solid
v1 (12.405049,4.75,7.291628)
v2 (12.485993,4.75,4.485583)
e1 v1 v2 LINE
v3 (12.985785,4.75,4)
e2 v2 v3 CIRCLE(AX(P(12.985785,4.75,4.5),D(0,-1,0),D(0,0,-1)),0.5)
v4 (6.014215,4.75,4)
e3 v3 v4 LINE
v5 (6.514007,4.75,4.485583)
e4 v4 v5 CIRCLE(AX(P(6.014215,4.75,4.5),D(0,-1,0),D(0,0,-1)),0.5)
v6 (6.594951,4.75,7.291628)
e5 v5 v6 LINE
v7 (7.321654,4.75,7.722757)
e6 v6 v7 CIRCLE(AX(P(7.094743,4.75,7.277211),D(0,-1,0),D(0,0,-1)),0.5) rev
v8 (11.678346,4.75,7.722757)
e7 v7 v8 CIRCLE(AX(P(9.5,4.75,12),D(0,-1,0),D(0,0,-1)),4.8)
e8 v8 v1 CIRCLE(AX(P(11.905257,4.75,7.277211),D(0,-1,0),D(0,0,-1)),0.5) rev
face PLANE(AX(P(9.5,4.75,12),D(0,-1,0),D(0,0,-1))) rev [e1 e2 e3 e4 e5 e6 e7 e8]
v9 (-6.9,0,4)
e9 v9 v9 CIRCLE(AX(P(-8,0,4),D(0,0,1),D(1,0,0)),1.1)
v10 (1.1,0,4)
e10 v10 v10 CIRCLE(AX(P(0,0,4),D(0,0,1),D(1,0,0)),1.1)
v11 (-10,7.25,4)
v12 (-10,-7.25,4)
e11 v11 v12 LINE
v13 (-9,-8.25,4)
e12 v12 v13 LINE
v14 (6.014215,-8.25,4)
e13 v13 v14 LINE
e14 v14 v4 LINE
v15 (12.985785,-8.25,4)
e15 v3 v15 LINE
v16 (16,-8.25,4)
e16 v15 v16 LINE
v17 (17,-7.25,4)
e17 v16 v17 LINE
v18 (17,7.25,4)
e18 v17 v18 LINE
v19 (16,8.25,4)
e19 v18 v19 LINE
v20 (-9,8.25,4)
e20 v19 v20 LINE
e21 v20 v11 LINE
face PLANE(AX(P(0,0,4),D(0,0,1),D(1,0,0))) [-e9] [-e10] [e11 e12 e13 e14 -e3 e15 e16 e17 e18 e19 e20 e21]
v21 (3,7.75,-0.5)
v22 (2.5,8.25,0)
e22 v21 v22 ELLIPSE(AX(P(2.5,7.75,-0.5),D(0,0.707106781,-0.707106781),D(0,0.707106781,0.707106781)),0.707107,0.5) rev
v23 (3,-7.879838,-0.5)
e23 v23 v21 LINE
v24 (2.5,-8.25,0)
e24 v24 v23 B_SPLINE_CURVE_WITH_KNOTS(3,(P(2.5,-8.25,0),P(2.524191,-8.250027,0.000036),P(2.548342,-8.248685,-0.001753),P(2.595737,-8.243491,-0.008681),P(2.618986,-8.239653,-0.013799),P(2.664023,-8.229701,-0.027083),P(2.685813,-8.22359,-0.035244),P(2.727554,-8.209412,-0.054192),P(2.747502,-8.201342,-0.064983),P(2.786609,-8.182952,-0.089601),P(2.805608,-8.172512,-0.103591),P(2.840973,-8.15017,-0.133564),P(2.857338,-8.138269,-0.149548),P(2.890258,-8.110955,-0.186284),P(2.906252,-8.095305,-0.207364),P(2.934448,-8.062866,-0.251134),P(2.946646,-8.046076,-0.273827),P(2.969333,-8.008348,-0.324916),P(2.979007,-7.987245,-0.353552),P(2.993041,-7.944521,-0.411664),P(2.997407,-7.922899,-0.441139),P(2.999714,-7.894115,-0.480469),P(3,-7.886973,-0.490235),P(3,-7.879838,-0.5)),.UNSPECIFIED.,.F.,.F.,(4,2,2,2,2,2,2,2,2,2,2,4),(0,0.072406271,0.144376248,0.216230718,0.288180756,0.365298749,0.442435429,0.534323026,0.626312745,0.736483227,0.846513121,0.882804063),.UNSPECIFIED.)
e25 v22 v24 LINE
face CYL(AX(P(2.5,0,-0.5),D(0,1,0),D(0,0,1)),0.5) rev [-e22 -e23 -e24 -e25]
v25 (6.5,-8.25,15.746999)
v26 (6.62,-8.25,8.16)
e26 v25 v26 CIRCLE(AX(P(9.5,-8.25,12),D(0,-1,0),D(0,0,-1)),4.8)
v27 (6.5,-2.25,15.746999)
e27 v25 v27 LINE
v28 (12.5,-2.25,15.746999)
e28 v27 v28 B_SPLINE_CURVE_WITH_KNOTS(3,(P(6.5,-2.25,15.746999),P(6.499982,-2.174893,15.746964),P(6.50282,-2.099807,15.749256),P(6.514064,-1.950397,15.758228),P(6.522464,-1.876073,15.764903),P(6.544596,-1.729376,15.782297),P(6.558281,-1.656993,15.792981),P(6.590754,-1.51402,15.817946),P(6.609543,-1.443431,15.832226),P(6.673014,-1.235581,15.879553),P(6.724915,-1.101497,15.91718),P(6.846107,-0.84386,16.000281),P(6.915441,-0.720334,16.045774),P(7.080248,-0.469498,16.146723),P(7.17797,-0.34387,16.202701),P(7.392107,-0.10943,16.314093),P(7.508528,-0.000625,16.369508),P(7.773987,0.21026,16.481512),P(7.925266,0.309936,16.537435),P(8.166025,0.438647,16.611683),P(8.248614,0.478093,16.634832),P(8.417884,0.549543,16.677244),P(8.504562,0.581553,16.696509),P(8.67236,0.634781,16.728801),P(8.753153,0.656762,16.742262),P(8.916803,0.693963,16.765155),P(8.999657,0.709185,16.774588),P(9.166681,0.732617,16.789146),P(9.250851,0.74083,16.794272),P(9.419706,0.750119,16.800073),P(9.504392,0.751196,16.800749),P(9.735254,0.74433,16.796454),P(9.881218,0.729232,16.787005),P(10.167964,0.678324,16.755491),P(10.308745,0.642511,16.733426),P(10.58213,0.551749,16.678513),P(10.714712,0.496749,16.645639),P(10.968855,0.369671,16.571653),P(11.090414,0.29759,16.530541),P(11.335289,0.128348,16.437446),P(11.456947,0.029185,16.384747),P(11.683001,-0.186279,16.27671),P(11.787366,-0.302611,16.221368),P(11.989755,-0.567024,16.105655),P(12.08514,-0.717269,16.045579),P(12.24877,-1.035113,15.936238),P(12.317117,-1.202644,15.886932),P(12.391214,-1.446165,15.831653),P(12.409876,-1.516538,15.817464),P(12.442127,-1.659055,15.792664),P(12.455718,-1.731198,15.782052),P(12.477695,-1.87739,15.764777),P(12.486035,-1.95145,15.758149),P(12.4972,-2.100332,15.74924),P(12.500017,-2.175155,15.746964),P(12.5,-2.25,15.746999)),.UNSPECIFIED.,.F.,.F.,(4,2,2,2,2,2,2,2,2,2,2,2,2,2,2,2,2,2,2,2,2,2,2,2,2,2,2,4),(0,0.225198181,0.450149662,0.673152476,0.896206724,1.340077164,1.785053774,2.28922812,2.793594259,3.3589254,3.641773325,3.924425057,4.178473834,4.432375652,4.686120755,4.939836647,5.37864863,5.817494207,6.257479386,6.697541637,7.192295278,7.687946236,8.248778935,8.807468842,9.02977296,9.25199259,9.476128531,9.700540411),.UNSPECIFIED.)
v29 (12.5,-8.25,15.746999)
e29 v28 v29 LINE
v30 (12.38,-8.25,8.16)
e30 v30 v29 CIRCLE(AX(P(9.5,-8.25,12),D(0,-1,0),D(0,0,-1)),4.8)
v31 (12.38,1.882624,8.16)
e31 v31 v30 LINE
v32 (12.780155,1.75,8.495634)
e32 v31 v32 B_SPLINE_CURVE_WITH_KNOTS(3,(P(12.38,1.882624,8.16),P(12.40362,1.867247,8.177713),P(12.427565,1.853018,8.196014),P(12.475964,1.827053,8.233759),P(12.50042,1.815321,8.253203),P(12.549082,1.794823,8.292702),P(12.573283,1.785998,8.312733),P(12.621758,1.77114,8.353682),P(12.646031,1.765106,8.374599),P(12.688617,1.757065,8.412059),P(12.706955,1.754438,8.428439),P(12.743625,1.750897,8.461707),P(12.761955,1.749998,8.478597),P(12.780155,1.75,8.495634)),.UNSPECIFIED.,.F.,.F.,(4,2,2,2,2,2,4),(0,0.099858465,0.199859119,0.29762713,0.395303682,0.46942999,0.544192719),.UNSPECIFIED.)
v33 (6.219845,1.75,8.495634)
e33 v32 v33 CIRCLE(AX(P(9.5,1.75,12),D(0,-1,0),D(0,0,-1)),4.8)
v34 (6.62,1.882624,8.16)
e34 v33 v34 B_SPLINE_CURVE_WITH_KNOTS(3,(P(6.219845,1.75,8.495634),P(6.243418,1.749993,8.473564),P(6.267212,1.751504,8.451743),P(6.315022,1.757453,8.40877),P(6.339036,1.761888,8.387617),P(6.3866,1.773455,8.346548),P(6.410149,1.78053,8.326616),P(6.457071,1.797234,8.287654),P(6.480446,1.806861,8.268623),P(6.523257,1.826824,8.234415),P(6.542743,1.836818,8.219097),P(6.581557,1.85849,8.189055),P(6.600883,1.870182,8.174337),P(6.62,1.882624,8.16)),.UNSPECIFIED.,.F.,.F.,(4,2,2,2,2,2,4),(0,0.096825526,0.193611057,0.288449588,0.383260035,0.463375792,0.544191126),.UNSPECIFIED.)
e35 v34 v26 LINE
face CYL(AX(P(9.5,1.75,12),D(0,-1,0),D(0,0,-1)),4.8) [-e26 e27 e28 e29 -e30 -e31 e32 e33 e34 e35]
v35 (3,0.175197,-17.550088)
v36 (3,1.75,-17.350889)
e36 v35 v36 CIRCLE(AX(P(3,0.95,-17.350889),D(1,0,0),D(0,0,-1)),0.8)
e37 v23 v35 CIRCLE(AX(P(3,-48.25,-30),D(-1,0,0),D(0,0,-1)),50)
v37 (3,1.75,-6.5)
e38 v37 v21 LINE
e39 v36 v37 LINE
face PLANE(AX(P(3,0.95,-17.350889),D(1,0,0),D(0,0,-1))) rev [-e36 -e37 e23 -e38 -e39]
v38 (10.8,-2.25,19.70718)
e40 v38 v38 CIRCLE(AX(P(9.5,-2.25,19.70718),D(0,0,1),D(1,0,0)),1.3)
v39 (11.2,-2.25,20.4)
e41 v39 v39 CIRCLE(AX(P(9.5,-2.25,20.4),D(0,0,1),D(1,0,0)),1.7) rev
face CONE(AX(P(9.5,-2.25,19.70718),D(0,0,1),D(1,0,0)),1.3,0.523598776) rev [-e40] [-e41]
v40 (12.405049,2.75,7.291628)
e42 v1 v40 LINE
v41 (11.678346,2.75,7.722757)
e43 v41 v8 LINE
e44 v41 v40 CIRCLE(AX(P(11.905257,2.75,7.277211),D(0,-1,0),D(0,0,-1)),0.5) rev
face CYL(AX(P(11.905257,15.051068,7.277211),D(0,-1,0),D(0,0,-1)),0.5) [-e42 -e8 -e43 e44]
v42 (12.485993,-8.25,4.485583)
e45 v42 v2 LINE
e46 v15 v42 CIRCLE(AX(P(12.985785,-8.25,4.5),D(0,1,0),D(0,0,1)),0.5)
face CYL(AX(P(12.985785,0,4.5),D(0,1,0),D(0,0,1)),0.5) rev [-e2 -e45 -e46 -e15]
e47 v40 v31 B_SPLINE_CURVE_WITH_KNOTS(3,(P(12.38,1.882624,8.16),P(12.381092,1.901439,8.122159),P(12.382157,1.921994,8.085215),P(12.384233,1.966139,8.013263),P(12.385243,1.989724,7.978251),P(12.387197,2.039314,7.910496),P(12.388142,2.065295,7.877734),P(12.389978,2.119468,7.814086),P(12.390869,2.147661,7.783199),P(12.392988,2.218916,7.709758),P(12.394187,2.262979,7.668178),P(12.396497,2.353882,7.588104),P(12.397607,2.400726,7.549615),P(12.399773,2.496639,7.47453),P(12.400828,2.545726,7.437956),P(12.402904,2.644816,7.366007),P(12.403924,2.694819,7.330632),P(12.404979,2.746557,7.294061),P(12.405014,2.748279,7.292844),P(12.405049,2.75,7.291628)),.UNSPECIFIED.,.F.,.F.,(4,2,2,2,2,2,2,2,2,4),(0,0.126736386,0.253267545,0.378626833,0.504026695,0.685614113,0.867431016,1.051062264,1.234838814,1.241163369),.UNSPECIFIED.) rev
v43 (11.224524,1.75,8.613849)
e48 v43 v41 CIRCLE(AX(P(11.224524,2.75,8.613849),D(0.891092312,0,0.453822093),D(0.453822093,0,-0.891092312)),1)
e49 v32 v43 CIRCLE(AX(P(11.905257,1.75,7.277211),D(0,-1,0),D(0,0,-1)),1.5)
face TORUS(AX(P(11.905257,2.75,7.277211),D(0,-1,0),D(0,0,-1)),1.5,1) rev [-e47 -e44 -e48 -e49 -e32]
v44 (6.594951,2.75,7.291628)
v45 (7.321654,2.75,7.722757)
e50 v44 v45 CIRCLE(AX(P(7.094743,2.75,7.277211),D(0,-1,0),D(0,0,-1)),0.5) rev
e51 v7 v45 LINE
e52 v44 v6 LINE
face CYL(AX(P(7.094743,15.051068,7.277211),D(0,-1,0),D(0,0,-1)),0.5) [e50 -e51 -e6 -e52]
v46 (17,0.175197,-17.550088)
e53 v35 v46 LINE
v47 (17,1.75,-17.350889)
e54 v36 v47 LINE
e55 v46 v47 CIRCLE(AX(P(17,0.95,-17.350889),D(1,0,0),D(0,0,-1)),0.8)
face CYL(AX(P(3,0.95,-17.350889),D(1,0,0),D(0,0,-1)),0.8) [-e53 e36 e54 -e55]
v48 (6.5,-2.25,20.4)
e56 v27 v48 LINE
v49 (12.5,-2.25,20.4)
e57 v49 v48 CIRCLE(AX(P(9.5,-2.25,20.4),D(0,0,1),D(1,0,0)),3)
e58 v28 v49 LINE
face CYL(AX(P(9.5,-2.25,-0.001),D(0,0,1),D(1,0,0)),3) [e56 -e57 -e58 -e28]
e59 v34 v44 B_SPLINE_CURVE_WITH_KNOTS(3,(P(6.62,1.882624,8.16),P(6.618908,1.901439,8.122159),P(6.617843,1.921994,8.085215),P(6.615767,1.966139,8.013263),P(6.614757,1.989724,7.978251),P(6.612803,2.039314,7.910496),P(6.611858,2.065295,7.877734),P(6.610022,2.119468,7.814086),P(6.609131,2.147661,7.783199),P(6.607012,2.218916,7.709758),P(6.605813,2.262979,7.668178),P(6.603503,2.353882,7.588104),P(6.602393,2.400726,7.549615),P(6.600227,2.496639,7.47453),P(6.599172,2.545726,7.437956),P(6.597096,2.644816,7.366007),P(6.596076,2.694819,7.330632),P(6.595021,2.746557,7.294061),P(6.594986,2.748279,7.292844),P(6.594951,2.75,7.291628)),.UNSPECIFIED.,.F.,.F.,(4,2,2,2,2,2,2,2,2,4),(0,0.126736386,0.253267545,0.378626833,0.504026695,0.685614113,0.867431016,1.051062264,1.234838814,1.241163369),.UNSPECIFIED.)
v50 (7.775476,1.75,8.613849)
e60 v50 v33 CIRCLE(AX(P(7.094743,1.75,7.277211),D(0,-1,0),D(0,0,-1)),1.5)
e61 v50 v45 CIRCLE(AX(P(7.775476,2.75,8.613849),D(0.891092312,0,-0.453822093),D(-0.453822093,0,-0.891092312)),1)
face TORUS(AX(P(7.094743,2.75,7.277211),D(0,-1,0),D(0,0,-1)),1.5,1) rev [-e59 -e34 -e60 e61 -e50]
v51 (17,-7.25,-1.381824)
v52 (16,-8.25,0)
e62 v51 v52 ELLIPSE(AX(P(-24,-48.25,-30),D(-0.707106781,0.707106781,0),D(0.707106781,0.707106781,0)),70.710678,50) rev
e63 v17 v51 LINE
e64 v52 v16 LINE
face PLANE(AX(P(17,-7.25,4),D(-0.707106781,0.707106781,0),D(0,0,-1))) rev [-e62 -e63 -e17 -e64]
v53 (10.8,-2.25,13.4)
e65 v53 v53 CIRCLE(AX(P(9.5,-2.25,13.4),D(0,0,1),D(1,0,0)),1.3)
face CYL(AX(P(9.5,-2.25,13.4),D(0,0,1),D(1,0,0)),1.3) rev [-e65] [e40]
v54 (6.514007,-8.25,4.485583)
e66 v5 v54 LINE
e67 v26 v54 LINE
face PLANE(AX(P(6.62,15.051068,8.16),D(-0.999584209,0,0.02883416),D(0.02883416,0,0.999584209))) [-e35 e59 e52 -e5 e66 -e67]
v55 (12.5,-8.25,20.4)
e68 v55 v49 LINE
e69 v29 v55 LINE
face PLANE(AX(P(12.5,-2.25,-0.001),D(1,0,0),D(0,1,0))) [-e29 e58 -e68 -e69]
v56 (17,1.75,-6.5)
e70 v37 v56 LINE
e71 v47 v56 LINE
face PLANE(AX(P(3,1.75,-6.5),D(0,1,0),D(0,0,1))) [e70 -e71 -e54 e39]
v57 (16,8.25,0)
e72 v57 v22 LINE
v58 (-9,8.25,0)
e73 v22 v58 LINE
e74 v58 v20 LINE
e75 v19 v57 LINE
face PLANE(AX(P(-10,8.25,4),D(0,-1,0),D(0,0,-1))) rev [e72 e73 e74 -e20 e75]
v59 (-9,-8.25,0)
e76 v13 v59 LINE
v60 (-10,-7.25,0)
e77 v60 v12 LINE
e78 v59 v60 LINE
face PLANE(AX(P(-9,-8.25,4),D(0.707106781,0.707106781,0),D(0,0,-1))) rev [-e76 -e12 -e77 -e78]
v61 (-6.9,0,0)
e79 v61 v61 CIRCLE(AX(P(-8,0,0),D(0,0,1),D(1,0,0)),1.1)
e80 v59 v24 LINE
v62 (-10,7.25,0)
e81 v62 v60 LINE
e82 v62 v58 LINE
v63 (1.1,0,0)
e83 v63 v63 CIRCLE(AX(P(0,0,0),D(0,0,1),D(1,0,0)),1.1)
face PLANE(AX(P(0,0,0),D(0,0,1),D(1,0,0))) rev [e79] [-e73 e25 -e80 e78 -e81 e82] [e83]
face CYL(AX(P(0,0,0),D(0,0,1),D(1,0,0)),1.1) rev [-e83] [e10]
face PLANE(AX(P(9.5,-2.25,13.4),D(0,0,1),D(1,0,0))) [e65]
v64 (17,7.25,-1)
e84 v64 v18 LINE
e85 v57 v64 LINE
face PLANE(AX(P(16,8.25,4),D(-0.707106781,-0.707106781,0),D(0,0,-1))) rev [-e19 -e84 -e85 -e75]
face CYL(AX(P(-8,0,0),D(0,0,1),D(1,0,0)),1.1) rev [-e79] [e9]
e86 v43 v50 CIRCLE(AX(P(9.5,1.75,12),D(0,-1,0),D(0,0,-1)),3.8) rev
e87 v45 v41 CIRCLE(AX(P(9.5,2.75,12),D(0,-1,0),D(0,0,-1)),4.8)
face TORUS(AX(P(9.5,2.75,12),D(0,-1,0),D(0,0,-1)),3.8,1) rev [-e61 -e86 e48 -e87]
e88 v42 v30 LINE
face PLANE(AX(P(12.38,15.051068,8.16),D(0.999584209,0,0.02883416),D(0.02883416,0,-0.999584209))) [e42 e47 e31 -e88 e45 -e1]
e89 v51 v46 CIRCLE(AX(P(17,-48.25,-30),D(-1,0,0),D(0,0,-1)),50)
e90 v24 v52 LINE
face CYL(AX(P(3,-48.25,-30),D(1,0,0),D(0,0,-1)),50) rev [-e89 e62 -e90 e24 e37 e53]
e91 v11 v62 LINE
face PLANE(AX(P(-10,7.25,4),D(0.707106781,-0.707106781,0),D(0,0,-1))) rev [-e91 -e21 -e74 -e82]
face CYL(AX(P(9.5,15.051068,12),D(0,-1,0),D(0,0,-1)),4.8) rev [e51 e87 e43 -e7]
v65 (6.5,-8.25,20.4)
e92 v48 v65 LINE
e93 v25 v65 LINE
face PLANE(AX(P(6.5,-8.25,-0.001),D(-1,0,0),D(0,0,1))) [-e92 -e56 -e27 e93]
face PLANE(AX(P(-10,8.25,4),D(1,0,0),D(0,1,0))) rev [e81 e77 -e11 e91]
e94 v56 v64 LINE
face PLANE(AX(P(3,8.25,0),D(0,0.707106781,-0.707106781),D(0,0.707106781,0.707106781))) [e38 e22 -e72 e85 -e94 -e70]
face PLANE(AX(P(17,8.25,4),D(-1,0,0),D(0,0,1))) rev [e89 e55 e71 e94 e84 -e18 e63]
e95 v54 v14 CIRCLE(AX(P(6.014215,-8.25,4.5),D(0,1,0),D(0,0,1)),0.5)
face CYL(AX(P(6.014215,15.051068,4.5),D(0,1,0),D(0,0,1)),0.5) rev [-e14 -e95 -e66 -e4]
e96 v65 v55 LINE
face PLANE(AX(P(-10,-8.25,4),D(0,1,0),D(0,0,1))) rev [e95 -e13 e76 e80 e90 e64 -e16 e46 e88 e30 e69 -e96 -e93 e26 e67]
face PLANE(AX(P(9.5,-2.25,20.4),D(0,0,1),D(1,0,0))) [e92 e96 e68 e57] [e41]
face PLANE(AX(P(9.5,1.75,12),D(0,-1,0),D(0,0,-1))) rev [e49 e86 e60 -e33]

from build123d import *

# Parameters (mm, degrees)
SKETCH_1_W           = 27
SKETCH_1_H           = 16.5
EXTRUDE_1_DEPTH      = 4
SKETCH_2_R           = 1.1
CUT_EXTRUDE_1_DEPTH  = 4
SKETCH_3_R           = 4.8
EXTRUDE_2_DEPTH      = 10
EXTRUDE_3_DEPTH      = 13
FILLET_1_R           = 0.5
FILLET_2_R           = 1
EXTRUDE_4_REACH      = 29.807
EXTRUDE_4_END_RADIUS = 4.8
SKETCH_7_R           = 1.3
CUT_EXTRUDE_3_DEPTH  = 7
CHAMFER_1_SIZE       = 0.4
CHAMFER_1_SIZE2      = 0.692820323
FILLET_3_R           = 0.5
EXTRUDE_5_DEPTH      = 14
FILLET_4_R           = 0.5
CHAMFER_2_SIZE       = 1


with BuildPart() as part:
    # 草图1 → 凸台-拉伸1 (new body)
    with BuildSketch(Plane.XY):
        with Locations((3.5, 0)):
            Rectangle(SKETCH_1_W, SKETCH_1_H)
    extrude(amount=EXTRUDE_1_DEPTH)

    # 草图2 → 切除-拉伸1 (cut)
    with BuildSketch(Plane.XY.offset(4)):
        with Locations((-8, 0)):
            Circle(SKETCH_2_R)
        Circle(SKETCH_2_R)
    extrude(amount=-CUT_EXTRUDE_1_DEPTH, mode=Mode.SUBTRACT)



with BuildPart() as body_2:
    # 草图3 → 凸台-拉伸2 (new body)
    with BuildSketch(Plane.XZ.offset(8.25)):
        with Locations(Location((9.5, 12, 0), (0, 0, 270))):
            Circle(SKETCH_3_R)
    extrude(amount=-EXTRUDE_2_DEPTH)


with BuildPart() as part_1:
    add(part.part)

    add(body_2.part)  # 凸台-拉伸3 merges body 2
    # 草图4 → 凸台-拉伸3 (add)
    with BuildSketch(Plane.XZ.offset(8.25)):
        with BuildLine():
            Line((6.5, 4), (12.5, 4))
            Line((12.5, 4), (12.38, 8.16))
            ThreePointArc((12.38, 8.16), (9.5, 7.2), (6.62, 8.16))
            Line((6.62, 8.16), (6.5, 4))
        make_face()
    extrude(amount=-EXTRUDE_3_DEPTH)

    # 圆角1
    fillet_1_edges = [part_1.edges().sort_by_distance(p)[0] for p in [
        (6.62, 3.25, 8.16),
        (12.38, 3.25, 8.16),
    ]]
    fillet(fillet_1_edges, radius=FILLET_1_R)

    # 圆角2
    # the kernel refuses this fillet: 1 mm, written as the material it adds along each edge
    with BuildSketch(Plane(origin=(7.094742907, 1.75, 7.277210748), x_dir=(0.45382209295910925, 0, 0.891092311683932), z_dir=(0.891092311683932, 0, -0.45382209295910925))) as fillet_2_piece_1_section:
        with BuildLine():
            CenterArc((0.5 + FILLET_2_R, -FILLET_2_R), FILLET_2_R, 90, 90)
            Line((0.5, -FILLET_2_R), (0.5, 0))
            Line((0.5, 0), (0.5 + FILLET_2_R, 0))
        make_face()
    fillet_2_piece_1 = revolve(axis=Axis((7.094742907, 1.75, 7.277210748), (0, -1, 0)), revolution_arc=359.64, mode=Mode.PRIVATE)
    fillet_2_piece_1 = split(fillet_2_piece_1, bisect_by=Plane(origin=(6.594950803, 1.75, 7.291627828), z_dir=(0.9995842091710025, 0, -0.02883415987993323)), keep=Keep.TOP, mode=Mode.PRIVATE)
    add(fillet_2_piece_1)
    with BuildSketch(Plane(origin=(7.094742907, 1.75, 7.277210748), x_dir=(0.45382209295910925, 0, 0.891092311683932), z_dir=(0.891092311683932, 0, -0.45382209295910925))) as fillet_2_piece_2_section:
        with BuildLine():
            CenterArc((0.5 + FILLET_2_R, -FILLET_2_R), FILLET_2_R, 90, 90)
            Line((0.5, -FILLET_2_R), (0.5, 0))
            Line((0.5, 0), (0.5 + FILLET_2_R, 0))
        make_face()
    fillet_2_piece_2 = revolve(axis=Axis((7.094742907, 1.75, 7.277210748), (0, -1, 0)), revolution_arc=359.64, mode=Mode.PRIVATE)
    fillet_2_piece_2 = fillet_2_piece_2 & Plane(origin=(9.5, 1.75, 12), x_dir=(0.6, 0, -0.8000000000000002), z_dir=(0, -1, 0)) * Cylinder(4.8, 6, mode=Mode.PRIVATE)
    add(fillet_2_piece_2)
    with BuildSketch(Plane(origin=(11.905257093, 1.75, 7.277210748), x_dir=(-0.45941199618044226, 0, 0.8882232927397824), z_dir=(0.8882232927397824, 0, 0.45941199618044226))) as fillet_2_piece_3_section:
        with BuildLine():
            CenterArc((0.5 + FILLET_2_R, -FILLET_2_R), FILLET_2_R, 90, 90)
            Line((0.5 + FILLET_2_R, 0), (0.5, 0))
            Line((0.5, 0), (0.5, -FILLET_2_R))
        make_face()
    fillet_2_piece_3 = revolve(axis=Axis((11.905257093, 1.75, 7.277210748), (0, -1, 0)), revolution_arc=359.64, mode=Mode.PRIVATE)
    fillet_2_piece_3 = split(fillet_2_piece_3, bisect_by=Plane(origin=(12.405049197, 1.75, 7.291627828), z_dir=(-0.9995842091710025, 0, -0.02883415987993387)), keep=Keep.TOP, mode=Mode.PRIVATE)
    add(fillet_2_piece_3)
    with BuildSketch(Plane(origin=(11.905257093, 1.75, 7.277210748), x_dir=(-0.45941199618044226, 0, 0.8882232927397824), z_dir=(0.8882232927397824, 0, 0.45941199618044226))) as fillet_2_piece_4_section:
        with BuildLine():
            CenterArc((0.5 + FILLET_2_R, -FILLET_2_R), FILLET_2_R, 90, 90)
            Line((0.5 + FILLET_2_R, 0), (0.5, 0))
            Line((0.5, 0), (0.5, -FILLET_2_R))
        make_face()
    fillet_2_piece_4 = revolve(axis=Axis((11.905257093, 1.75, 7.277210748), (0, -1, 0)), revolution_arc=359.64, mode=Mode.PRIVATE)
    fillet_2_piece_4 = fillet_2_piece_4 & Plane(origin=(9.5, 1.75, 12), x_dir=(0.6, 0, -0.8000000000000002), z_dir=(0, -1, 0)) * Cylinder(4.8, 7, mode=Mode.PRIVATE)
    add(fillet_2_piece_4)
    with BuildSketch(Plane(origin=(9.5, 1.75, 12), x_dir=(-0.4538220929591119, 0, -0.8910923116839305), z_dir=(-0.8910923116839305, 0, 0.4538220929591119))) as fillet_2_piece_5:
        with BuildLine():
            CenterArc((4.8 - FILLET_2_R, -FILLET_2_R), FILLET_2_R, 0, 90)
            Line((4.8, -FILLET_2_R), (4.8, 0))
            Line((4.8, 0), (4.8 - FILLET_2_R, 0))
        make_face()
    revolve(axis=Axis((9.5, 1.75, 12), (0, -1, 0)), revolution_arc=53.978342396)

    # 凸台-拉伸4: up to this cylinder (the profile starts outside it)
    extrude_4_end = Plane(origin=(9.5, -4.045075, 12), z_dir=(0, -1, 0)) * Cylinder(EXTRUDE_4_END_RADIUS, 70.214, mode=Mode.PRIVATE)
    # 草图5 → 凸台-拉伸4 (add, up to the surface)
    with BuildSketch(Plane.XY.offset(20.4), mode=Mode.PRIVATE) as extrude_4_sk1:
        with BuildLine():
            Line((6.5, -8.25), (6.5, -2.25))
            ThreePointArc((6.5, -2.25), (9.5, 0.75), (12.5, -2.25))
            Line((12.5, -2.25), (12.5, -8.25))
            Line((12.5, -8.25), (6.5, -8.25))
        make_face()
    extrude_4_tool1 = extrude(extrude_4_sk1.sketch, amount=-EXTRUDE_4_REACH, mode=Mode.PRIVATE) - extrude_4_end
    add(extrude_4_tool1.solids().sort_by_distance((9.5, -4.045075, 20.4))[0])

    # 草图7 → 切除-拉伸3 (cut)
    with BuildSketch(Plane.XY.offset(20.4)):
        with Locations((9.5, -2.25)):
            Circle(SKETCH_7_R)
    extrude(amount=-CUT_EXTRUDE_3_DEPTH, mode=Mode.SUBTRACT)

    # 倒角1
    chamfer_1_edges = [part_1.edges().sort_by_distance(p)[0] for p in [
        (8.2, -2.25, 20.4),
    ]]
    chamfer_1_side = [part_1.faces().sort_by_distance(p)[0] for p in [
        (9.5, -4.257679358, 20.4),
    ]]
    chamfer(chamfer_1_edges, length=CHAMFER_1_SIZE, length2=CHAMFER_1_SIZE2, reference=chamfer_1_side[0])

    # 圆角3
    fillet_3_edges = [part_1.edges().sort_by_distance(p)[0] for p in [
        (6.5, -1.75, 4),
        (12.5, -1.75, 4),
    ]]
    fillet(fillet_3_edges, radius=FILLET_3_R)

    # 草图8 → 凸台-拉伸5 (add)
    with BuildSketch(Plane(origin=(17, 0, 0), x_dir=(0, 0, -1), z_dir=(1, 0, 0))):
        with BuildLine():
            Line((6.5, 1.75), (17.350889359, 1.75))
            ThreePointArc((17.350889359, 1.75), (18.144565149, 1.050392929), (17.550087952, 0.17519685))
            ThreePointArc((17.550087952, 0.17519685), (8.361036446, -3.17500409), (0, -8.25))
            Line((0, -8.25), (0, 8.25))
            Line((0, 8.25), (6.5, 1.75))
        make_face()
    extrude(amount=-EXTRUDE_5_DEPTH)

    # 圆角4
    # the kernel refuses this fillet: 0.5 mm, written as the material it adds along each edge
    with BuildSketch(Plane(origin=(3, -8.25, 0), x_dir=(-1, 0, 0), z_dir=(0, 1, 0))) as fillet_4_piece_1_section:
        with BuildLine():
            CenterArc((FILLET_4_R, -FILLET_4_R), FILLET_4_R, 90, 90)
            Line((0, -FILLET_4_R), (0, 0))
            Line((0, 0), (FILLET_4_R, 0))
        make_face()
    fillet_4_piece_1 = extrude(amount=16.5, mode=Mode.PRIVATE)
    fillet_4_piece_1 = fillet_4_piece_1 - Plane(origin=(3, -48.25, -30), x_dir=(0, 0.9685039370078732, 0.24899824095814338), z_dir=(1, 0, 0)) * Cylinder(50, 35, mode=Mode.PRIVATE)
    fillet_4_piece_1 = split(fillet_4_piece_1, bisect_by=Plane(origin=(3, 0, -8.25), z_dir=(0, -0.7071067811865462, 0.7071067811865488)), keep=Keep.TOP, mode=Mode.PRIVATE)
    add(fillet_4_piece_1)

    # 倒角2
    chamfer_2_edges = [part_1.edges().sort_by_distance(p)[0] for p in [
        (-10, 8.25, 2),
        (17, 8.25, 2),
        (17, -8.25, 2),
        (-10, -8.25, 2),
    ]]
    chamfer(chamfer_2_edges, length=CHAMFER_2_SIZE)


solid = part_1.part
